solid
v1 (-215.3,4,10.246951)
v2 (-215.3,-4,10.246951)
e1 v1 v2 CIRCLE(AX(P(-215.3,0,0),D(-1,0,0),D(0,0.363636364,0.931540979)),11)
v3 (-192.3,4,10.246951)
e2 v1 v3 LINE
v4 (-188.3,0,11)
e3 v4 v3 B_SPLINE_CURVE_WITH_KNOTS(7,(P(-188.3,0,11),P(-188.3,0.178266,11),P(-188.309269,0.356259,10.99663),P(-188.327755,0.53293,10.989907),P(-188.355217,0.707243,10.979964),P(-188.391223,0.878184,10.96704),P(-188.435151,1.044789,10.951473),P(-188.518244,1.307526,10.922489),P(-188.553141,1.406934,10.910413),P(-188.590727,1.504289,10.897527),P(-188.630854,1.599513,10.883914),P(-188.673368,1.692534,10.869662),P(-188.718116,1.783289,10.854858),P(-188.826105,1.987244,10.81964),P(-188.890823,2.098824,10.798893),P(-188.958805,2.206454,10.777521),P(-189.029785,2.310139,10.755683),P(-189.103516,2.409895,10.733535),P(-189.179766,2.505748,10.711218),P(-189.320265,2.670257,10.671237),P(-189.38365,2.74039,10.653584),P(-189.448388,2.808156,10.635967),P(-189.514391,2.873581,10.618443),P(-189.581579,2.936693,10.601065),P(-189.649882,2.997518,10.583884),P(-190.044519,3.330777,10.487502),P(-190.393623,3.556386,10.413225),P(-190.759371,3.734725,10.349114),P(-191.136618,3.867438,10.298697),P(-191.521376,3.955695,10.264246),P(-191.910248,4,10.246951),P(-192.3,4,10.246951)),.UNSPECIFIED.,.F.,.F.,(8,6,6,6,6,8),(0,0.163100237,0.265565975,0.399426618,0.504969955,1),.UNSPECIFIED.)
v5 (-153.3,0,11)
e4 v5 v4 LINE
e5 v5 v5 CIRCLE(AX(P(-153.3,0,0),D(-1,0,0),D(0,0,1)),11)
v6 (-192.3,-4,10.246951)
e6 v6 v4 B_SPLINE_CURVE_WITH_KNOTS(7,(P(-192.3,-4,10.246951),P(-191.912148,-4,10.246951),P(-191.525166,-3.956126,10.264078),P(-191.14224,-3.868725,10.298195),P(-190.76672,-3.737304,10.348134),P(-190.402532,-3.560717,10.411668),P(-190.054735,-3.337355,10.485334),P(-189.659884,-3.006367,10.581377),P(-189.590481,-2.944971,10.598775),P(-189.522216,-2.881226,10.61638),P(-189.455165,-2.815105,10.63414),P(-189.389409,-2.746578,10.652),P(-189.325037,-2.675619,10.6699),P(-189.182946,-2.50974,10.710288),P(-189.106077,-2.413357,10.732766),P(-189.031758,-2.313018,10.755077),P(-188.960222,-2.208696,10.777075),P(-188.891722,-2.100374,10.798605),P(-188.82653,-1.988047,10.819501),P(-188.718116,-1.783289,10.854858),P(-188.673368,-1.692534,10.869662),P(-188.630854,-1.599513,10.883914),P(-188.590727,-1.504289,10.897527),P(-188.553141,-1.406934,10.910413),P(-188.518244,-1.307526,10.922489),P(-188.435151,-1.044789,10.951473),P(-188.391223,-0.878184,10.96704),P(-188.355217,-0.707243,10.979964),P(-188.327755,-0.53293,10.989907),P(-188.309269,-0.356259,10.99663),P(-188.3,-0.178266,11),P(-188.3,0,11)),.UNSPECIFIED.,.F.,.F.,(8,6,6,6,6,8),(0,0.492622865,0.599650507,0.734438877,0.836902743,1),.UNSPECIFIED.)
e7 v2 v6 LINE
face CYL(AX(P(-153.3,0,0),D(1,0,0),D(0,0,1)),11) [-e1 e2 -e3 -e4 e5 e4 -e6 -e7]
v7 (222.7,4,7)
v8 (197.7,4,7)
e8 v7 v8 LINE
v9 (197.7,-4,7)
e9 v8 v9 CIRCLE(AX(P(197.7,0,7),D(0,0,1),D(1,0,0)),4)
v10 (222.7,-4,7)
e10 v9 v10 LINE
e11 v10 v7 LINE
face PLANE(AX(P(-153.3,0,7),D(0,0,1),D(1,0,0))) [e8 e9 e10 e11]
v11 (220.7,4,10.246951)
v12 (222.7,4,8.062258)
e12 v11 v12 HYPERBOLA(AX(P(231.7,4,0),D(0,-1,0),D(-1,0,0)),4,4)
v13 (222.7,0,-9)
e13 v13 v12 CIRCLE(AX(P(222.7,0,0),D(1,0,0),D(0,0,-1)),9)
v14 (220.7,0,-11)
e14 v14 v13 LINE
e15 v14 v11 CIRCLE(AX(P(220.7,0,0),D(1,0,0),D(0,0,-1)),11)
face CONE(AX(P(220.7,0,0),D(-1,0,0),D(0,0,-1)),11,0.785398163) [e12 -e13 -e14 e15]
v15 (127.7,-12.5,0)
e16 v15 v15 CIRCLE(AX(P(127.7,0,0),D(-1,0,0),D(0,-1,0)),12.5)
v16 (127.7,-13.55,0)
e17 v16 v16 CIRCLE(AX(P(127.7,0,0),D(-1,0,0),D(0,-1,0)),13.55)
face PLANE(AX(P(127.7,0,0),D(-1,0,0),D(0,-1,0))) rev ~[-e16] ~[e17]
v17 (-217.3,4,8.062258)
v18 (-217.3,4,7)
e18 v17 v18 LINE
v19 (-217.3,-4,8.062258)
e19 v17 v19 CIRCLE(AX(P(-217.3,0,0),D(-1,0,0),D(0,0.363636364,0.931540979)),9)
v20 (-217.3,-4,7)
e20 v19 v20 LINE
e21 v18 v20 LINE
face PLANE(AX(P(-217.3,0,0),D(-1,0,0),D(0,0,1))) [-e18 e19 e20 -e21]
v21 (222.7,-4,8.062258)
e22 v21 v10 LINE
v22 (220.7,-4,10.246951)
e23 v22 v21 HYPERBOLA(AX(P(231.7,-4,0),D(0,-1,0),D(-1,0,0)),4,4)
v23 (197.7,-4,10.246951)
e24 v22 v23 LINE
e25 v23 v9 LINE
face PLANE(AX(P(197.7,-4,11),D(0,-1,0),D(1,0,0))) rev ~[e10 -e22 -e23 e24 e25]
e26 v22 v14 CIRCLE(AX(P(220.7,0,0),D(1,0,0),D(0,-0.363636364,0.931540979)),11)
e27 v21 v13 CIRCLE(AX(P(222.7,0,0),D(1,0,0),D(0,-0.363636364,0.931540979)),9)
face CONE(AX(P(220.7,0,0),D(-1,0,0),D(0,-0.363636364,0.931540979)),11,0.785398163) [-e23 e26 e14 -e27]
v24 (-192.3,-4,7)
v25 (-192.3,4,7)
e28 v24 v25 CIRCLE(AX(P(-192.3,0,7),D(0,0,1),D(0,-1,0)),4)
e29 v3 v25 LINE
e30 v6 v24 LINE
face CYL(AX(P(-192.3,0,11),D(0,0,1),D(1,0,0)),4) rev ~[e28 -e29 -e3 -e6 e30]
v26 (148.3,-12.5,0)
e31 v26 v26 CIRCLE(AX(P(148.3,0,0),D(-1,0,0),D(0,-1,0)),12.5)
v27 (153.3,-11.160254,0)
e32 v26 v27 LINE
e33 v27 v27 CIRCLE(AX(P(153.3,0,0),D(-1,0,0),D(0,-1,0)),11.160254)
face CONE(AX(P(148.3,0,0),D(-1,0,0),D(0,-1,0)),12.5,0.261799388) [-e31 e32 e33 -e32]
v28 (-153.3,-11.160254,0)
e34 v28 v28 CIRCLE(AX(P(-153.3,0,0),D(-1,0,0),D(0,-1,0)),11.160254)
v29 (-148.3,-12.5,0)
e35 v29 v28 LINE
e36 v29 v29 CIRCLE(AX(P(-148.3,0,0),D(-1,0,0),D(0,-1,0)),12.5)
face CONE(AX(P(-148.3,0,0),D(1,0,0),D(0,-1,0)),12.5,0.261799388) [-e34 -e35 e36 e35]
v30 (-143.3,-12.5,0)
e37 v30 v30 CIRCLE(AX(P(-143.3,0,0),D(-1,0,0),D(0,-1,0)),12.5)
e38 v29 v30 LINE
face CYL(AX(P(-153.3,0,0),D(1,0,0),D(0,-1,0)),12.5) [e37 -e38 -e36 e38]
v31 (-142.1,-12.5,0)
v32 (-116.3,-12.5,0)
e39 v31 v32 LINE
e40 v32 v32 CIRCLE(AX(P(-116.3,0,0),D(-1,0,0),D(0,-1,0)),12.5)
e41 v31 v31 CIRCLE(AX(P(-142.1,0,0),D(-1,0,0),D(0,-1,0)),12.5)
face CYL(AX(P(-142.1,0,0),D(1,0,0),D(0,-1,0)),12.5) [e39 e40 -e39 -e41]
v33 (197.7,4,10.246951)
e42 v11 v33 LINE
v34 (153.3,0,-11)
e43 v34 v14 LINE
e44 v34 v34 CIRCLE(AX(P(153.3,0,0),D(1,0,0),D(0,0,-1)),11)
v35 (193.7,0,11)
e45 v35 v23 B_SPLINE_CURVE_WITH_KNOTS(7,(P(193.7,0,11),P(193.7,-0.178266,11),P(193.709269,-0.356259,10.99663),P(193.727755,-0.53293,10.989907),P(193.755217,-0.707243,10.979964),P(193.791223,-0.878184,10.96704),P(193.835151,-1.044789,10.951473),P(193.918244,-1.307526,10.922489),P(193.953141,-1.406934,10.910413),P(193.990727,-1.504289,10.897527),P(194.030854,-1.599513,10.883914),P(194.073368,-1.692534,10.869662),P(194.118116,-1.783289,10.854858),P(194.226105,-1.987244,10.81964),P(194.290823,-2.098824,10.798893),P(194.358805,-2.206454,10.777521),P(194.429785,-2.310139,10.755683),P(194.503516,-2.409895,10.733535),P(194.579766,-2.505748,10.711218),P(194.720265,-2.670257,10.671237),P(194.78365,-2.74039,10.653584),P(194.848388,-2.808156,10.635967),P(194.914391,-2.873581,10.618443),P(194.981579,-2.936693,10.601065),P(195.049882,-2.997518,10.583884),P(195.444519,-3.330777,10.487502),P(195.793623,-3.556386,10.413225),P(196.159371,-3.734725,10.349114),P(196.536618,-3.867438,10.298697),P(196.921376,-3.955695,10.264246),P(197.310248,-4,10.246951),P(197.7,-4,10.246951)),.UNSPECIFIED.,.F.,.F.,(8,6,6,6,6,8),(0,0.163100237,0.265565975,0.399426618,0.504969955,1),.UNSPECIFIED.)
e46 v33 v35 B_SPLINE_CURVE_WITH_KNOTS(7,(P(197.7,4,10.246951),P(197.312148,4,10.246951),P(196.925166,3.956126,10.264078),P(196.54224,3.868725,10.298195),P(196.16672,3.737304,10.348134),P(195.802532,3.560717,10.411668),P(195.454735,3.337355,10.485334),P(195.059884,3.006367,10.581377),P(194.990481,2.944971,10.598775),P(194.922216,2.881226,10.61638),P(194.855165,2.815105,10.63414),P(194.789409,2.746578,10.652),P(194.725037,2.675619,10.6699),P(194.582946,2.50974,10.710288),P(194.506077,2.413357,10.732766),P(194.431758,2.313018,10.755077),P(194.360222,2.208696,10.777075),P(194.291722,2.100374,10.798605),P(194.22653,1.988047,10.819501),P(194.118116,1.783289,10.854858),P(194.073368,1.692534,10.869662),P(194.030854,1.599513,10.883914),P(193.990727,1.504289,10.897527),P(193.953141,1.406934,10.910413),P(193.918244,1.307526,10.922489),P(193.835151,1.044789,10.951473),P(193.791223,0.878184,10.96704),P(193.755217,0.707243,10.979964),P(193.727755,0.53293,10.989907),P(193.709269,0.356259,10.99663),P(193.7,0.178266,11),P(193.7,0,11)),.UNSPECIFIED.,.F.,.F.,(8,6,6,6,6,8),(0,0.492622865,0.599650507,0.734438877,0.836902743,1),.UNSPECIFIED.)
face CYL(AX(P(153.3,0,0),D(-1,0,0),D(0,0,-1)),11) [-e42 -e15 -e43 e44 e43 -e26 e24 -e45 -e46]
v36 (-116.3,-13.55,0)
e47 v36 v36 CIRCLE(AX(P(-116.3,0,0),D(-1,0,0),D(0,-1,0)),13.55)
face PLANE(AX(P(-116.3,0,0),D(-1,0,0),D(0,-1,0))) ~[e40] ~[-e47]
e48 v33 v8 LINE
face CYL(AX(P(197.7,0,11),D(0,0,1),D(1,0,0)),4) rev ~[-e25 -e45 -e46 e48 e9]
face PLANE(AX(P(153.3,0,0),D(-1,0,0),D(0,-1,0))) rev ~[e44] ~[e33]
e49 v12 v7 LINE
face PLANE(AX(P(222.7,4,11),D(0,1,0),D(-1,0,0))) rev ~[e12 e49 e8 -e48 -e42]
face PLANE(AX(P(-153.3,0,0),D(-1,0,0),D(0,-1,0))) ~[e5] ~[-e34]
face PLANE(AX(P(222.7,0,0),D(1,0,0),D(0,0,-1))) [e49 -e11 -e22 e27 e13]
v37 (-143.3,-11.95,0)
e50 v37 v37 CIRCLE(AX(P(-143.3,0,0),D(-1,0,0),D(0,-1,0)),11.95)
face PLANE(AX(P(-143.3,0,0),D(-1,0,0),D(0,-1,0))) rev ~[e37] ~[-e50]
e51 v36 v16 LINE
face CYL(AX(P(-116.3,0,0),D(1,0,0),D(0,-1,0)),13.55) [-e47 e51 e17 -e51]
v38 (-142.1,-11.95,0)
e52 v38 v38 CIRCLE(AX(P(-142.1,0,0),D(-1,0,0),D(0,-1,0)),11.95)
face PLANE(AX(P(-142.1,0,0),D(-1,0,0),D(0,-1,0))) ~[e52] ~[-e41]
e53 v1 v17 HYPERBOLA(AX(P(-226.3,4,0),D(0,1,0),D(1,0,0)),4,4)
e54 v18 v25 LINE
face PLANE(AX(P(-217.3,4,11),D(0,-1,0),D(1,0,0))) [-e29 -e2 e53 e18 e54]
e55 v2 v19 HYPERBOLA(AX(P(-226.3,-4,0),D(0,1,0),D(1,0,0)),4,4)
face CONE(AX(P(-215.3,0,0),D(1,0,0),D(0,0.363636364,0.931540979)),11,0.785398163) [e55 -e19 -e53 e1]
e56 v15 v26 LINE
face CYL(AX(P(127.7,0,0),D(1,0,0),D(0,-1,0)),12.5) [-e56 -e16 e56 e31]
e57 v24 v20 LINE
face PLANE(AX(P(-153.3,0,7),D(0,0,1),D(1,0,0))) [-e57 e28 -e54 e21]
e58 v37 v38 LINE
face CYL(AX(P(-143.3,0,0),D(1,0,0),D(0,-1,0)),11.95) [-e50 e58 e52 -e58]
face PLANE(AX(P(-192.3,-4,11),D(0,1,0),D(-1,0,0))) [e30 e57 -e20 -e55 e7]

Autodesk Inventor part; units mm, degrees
ref_plane "YZ Plane" through (0, 0, 0) normal (1, 0, 0) x (0, 1, 0)
ref_plane "XZ Plane" through (0, 0, 0) normal (0, 1, 0) x (-1, 0, 0)
sketch "Sketch1" plane through (0, 0, 0) normal (0, 0, 1) x (1, 0, 0)
  line L0 (-153.3, -12.5) -> (-143.3, -12.5)
  line L1 (-143.3, -12.5) -> (-143.3, -11.95)
  line L2 (-143.3, -11.95) -> (-142.1, -11.95)
  line L3 (-142.1, -11.95) -> (-142.1, -12.5)
  line L4 (-142.1, -12.5) -> (-116.3, -12.5)
  line L5 (-116.3, -12.5) -> (-116.3, -13.55)
  line L6 (-116.3, -13.55) -> (127.7, -13.55)
  line L7 (127.7, -13.55) -> (127.7, -12.5)
  line L8 (127.7, -12.5) -> (153.3, -12.5)
  line L9 (153.3, -12.5) -> (153.3, 0)
  line L10 (153.3, 0) -> (-153.3, 0)
  line L11 (-153.3, 0) -> (-153.3, -12.5)
  point P0 (0, 0)
  point P1 (0, 0)
  point P2 (127.7, -13.025)
  point P3 (-153.3, -6.25)
  dimension "d0" = 12.5
  dimension "d1" = 10
  dimension "d2" = 1.2
  dimension "d3" = 0.55
  dimension "d4" = 25.8
  dimension "d5" = 13.55
  dimension "d6" = 11.95
  dimension "d7" = 244
  dimension "d8" = 12.5
  dimension "d26" = 306.6
revolve "Revolution1" add sketch "Sketch1" angle 360 about axis through (153.3, 0, 0) along (-1, 0, 0)
sketch "Sketch2" plane through (-153.3, 0, 0) normal (-1, 0, 0) x (0, 0, 1)
  circle A0 centre (0, 0) radius 11
  point P0 (0, 0)
  dimension "d11" = 22
extrude "Extrusion1" add sketch "Sketch2" along normal blind 64
sketch "Sketch3" plane through (153.3, 0, 0) normal (1, 0, 0) x (0, 0, -1)
  point P0 (0, 0)
sketch "Sketch4" plane through (153.3, 0, 0) normal (1, 0, 0) x (0, 0, -1)
  circle A0 centre (0, 0) radius 11
  point P0 (0, 0)
  dimension "d14" = 22
extrude "Extrusion2" add sketch "Sketch4" along normal blind 69.4
ref_plane "Work Plane1" through (-153.3, 0, 11) normal (0, 0, 1) x (1, 0, 0)
sketch "Sketch5" plane through (-153.3, 0, 11) normal (0, 0, 1) x (1, 0, 0)
  line L0 (-64, 11) -> (-64, -11) projected
  line L1 (-64, 4) -> (-39, 4)
  line L2 (-39, 4) -> (-39, -4)
  line L3 (-39, -4) -> (-64, -4)
  line L4 (-64, -4) -> (-64, 4)
  circle A0 centre (-39, 0) radius 4
  line L5 (376, -11) -> (376, 11) projected
  line L6 (376, 4) -> (351, 4)
  line L7 (351, 4) -> (351, -4)
  line L8 (351, -4) -> (376, -4)
  line L9 (376, -4) -> (376, 4)
  circle A1 centre (351, 0) radius 4
  point P0 (153.3, 0)
  point P1 (-64, 0)
  point P2 (376, 0)
  point P3 (376, 0)
  dimension "d17" = 8
  dimension "d18" = 25
  dimension "d19" = 8
  dimension "d20" = 25
extrude "Extrusion3" cut sketch "Sketch5" against normal blind 4
chamfer "Chamfer1" distance 2 angle 45 3 edges at (-217.3, 0, -11) (222.7, -10.8101, -2.0351) (222.7, 10.8101, -2.0351)
chamfer "Chamfer2" distance 5 angle 15 1 edges at (-153.3, 12.5, 0) measured on face at (-149.9667, -12.3381, -2.0051)
chamfer "Chamfer3" distance 5 angle 15 1 edges at (153.3, 12.5, 0) measured on face at (136.2333, -12.3381, -2.0051)
properties part number "Shaft" material "Steel, High Strength, Low Alloy"
